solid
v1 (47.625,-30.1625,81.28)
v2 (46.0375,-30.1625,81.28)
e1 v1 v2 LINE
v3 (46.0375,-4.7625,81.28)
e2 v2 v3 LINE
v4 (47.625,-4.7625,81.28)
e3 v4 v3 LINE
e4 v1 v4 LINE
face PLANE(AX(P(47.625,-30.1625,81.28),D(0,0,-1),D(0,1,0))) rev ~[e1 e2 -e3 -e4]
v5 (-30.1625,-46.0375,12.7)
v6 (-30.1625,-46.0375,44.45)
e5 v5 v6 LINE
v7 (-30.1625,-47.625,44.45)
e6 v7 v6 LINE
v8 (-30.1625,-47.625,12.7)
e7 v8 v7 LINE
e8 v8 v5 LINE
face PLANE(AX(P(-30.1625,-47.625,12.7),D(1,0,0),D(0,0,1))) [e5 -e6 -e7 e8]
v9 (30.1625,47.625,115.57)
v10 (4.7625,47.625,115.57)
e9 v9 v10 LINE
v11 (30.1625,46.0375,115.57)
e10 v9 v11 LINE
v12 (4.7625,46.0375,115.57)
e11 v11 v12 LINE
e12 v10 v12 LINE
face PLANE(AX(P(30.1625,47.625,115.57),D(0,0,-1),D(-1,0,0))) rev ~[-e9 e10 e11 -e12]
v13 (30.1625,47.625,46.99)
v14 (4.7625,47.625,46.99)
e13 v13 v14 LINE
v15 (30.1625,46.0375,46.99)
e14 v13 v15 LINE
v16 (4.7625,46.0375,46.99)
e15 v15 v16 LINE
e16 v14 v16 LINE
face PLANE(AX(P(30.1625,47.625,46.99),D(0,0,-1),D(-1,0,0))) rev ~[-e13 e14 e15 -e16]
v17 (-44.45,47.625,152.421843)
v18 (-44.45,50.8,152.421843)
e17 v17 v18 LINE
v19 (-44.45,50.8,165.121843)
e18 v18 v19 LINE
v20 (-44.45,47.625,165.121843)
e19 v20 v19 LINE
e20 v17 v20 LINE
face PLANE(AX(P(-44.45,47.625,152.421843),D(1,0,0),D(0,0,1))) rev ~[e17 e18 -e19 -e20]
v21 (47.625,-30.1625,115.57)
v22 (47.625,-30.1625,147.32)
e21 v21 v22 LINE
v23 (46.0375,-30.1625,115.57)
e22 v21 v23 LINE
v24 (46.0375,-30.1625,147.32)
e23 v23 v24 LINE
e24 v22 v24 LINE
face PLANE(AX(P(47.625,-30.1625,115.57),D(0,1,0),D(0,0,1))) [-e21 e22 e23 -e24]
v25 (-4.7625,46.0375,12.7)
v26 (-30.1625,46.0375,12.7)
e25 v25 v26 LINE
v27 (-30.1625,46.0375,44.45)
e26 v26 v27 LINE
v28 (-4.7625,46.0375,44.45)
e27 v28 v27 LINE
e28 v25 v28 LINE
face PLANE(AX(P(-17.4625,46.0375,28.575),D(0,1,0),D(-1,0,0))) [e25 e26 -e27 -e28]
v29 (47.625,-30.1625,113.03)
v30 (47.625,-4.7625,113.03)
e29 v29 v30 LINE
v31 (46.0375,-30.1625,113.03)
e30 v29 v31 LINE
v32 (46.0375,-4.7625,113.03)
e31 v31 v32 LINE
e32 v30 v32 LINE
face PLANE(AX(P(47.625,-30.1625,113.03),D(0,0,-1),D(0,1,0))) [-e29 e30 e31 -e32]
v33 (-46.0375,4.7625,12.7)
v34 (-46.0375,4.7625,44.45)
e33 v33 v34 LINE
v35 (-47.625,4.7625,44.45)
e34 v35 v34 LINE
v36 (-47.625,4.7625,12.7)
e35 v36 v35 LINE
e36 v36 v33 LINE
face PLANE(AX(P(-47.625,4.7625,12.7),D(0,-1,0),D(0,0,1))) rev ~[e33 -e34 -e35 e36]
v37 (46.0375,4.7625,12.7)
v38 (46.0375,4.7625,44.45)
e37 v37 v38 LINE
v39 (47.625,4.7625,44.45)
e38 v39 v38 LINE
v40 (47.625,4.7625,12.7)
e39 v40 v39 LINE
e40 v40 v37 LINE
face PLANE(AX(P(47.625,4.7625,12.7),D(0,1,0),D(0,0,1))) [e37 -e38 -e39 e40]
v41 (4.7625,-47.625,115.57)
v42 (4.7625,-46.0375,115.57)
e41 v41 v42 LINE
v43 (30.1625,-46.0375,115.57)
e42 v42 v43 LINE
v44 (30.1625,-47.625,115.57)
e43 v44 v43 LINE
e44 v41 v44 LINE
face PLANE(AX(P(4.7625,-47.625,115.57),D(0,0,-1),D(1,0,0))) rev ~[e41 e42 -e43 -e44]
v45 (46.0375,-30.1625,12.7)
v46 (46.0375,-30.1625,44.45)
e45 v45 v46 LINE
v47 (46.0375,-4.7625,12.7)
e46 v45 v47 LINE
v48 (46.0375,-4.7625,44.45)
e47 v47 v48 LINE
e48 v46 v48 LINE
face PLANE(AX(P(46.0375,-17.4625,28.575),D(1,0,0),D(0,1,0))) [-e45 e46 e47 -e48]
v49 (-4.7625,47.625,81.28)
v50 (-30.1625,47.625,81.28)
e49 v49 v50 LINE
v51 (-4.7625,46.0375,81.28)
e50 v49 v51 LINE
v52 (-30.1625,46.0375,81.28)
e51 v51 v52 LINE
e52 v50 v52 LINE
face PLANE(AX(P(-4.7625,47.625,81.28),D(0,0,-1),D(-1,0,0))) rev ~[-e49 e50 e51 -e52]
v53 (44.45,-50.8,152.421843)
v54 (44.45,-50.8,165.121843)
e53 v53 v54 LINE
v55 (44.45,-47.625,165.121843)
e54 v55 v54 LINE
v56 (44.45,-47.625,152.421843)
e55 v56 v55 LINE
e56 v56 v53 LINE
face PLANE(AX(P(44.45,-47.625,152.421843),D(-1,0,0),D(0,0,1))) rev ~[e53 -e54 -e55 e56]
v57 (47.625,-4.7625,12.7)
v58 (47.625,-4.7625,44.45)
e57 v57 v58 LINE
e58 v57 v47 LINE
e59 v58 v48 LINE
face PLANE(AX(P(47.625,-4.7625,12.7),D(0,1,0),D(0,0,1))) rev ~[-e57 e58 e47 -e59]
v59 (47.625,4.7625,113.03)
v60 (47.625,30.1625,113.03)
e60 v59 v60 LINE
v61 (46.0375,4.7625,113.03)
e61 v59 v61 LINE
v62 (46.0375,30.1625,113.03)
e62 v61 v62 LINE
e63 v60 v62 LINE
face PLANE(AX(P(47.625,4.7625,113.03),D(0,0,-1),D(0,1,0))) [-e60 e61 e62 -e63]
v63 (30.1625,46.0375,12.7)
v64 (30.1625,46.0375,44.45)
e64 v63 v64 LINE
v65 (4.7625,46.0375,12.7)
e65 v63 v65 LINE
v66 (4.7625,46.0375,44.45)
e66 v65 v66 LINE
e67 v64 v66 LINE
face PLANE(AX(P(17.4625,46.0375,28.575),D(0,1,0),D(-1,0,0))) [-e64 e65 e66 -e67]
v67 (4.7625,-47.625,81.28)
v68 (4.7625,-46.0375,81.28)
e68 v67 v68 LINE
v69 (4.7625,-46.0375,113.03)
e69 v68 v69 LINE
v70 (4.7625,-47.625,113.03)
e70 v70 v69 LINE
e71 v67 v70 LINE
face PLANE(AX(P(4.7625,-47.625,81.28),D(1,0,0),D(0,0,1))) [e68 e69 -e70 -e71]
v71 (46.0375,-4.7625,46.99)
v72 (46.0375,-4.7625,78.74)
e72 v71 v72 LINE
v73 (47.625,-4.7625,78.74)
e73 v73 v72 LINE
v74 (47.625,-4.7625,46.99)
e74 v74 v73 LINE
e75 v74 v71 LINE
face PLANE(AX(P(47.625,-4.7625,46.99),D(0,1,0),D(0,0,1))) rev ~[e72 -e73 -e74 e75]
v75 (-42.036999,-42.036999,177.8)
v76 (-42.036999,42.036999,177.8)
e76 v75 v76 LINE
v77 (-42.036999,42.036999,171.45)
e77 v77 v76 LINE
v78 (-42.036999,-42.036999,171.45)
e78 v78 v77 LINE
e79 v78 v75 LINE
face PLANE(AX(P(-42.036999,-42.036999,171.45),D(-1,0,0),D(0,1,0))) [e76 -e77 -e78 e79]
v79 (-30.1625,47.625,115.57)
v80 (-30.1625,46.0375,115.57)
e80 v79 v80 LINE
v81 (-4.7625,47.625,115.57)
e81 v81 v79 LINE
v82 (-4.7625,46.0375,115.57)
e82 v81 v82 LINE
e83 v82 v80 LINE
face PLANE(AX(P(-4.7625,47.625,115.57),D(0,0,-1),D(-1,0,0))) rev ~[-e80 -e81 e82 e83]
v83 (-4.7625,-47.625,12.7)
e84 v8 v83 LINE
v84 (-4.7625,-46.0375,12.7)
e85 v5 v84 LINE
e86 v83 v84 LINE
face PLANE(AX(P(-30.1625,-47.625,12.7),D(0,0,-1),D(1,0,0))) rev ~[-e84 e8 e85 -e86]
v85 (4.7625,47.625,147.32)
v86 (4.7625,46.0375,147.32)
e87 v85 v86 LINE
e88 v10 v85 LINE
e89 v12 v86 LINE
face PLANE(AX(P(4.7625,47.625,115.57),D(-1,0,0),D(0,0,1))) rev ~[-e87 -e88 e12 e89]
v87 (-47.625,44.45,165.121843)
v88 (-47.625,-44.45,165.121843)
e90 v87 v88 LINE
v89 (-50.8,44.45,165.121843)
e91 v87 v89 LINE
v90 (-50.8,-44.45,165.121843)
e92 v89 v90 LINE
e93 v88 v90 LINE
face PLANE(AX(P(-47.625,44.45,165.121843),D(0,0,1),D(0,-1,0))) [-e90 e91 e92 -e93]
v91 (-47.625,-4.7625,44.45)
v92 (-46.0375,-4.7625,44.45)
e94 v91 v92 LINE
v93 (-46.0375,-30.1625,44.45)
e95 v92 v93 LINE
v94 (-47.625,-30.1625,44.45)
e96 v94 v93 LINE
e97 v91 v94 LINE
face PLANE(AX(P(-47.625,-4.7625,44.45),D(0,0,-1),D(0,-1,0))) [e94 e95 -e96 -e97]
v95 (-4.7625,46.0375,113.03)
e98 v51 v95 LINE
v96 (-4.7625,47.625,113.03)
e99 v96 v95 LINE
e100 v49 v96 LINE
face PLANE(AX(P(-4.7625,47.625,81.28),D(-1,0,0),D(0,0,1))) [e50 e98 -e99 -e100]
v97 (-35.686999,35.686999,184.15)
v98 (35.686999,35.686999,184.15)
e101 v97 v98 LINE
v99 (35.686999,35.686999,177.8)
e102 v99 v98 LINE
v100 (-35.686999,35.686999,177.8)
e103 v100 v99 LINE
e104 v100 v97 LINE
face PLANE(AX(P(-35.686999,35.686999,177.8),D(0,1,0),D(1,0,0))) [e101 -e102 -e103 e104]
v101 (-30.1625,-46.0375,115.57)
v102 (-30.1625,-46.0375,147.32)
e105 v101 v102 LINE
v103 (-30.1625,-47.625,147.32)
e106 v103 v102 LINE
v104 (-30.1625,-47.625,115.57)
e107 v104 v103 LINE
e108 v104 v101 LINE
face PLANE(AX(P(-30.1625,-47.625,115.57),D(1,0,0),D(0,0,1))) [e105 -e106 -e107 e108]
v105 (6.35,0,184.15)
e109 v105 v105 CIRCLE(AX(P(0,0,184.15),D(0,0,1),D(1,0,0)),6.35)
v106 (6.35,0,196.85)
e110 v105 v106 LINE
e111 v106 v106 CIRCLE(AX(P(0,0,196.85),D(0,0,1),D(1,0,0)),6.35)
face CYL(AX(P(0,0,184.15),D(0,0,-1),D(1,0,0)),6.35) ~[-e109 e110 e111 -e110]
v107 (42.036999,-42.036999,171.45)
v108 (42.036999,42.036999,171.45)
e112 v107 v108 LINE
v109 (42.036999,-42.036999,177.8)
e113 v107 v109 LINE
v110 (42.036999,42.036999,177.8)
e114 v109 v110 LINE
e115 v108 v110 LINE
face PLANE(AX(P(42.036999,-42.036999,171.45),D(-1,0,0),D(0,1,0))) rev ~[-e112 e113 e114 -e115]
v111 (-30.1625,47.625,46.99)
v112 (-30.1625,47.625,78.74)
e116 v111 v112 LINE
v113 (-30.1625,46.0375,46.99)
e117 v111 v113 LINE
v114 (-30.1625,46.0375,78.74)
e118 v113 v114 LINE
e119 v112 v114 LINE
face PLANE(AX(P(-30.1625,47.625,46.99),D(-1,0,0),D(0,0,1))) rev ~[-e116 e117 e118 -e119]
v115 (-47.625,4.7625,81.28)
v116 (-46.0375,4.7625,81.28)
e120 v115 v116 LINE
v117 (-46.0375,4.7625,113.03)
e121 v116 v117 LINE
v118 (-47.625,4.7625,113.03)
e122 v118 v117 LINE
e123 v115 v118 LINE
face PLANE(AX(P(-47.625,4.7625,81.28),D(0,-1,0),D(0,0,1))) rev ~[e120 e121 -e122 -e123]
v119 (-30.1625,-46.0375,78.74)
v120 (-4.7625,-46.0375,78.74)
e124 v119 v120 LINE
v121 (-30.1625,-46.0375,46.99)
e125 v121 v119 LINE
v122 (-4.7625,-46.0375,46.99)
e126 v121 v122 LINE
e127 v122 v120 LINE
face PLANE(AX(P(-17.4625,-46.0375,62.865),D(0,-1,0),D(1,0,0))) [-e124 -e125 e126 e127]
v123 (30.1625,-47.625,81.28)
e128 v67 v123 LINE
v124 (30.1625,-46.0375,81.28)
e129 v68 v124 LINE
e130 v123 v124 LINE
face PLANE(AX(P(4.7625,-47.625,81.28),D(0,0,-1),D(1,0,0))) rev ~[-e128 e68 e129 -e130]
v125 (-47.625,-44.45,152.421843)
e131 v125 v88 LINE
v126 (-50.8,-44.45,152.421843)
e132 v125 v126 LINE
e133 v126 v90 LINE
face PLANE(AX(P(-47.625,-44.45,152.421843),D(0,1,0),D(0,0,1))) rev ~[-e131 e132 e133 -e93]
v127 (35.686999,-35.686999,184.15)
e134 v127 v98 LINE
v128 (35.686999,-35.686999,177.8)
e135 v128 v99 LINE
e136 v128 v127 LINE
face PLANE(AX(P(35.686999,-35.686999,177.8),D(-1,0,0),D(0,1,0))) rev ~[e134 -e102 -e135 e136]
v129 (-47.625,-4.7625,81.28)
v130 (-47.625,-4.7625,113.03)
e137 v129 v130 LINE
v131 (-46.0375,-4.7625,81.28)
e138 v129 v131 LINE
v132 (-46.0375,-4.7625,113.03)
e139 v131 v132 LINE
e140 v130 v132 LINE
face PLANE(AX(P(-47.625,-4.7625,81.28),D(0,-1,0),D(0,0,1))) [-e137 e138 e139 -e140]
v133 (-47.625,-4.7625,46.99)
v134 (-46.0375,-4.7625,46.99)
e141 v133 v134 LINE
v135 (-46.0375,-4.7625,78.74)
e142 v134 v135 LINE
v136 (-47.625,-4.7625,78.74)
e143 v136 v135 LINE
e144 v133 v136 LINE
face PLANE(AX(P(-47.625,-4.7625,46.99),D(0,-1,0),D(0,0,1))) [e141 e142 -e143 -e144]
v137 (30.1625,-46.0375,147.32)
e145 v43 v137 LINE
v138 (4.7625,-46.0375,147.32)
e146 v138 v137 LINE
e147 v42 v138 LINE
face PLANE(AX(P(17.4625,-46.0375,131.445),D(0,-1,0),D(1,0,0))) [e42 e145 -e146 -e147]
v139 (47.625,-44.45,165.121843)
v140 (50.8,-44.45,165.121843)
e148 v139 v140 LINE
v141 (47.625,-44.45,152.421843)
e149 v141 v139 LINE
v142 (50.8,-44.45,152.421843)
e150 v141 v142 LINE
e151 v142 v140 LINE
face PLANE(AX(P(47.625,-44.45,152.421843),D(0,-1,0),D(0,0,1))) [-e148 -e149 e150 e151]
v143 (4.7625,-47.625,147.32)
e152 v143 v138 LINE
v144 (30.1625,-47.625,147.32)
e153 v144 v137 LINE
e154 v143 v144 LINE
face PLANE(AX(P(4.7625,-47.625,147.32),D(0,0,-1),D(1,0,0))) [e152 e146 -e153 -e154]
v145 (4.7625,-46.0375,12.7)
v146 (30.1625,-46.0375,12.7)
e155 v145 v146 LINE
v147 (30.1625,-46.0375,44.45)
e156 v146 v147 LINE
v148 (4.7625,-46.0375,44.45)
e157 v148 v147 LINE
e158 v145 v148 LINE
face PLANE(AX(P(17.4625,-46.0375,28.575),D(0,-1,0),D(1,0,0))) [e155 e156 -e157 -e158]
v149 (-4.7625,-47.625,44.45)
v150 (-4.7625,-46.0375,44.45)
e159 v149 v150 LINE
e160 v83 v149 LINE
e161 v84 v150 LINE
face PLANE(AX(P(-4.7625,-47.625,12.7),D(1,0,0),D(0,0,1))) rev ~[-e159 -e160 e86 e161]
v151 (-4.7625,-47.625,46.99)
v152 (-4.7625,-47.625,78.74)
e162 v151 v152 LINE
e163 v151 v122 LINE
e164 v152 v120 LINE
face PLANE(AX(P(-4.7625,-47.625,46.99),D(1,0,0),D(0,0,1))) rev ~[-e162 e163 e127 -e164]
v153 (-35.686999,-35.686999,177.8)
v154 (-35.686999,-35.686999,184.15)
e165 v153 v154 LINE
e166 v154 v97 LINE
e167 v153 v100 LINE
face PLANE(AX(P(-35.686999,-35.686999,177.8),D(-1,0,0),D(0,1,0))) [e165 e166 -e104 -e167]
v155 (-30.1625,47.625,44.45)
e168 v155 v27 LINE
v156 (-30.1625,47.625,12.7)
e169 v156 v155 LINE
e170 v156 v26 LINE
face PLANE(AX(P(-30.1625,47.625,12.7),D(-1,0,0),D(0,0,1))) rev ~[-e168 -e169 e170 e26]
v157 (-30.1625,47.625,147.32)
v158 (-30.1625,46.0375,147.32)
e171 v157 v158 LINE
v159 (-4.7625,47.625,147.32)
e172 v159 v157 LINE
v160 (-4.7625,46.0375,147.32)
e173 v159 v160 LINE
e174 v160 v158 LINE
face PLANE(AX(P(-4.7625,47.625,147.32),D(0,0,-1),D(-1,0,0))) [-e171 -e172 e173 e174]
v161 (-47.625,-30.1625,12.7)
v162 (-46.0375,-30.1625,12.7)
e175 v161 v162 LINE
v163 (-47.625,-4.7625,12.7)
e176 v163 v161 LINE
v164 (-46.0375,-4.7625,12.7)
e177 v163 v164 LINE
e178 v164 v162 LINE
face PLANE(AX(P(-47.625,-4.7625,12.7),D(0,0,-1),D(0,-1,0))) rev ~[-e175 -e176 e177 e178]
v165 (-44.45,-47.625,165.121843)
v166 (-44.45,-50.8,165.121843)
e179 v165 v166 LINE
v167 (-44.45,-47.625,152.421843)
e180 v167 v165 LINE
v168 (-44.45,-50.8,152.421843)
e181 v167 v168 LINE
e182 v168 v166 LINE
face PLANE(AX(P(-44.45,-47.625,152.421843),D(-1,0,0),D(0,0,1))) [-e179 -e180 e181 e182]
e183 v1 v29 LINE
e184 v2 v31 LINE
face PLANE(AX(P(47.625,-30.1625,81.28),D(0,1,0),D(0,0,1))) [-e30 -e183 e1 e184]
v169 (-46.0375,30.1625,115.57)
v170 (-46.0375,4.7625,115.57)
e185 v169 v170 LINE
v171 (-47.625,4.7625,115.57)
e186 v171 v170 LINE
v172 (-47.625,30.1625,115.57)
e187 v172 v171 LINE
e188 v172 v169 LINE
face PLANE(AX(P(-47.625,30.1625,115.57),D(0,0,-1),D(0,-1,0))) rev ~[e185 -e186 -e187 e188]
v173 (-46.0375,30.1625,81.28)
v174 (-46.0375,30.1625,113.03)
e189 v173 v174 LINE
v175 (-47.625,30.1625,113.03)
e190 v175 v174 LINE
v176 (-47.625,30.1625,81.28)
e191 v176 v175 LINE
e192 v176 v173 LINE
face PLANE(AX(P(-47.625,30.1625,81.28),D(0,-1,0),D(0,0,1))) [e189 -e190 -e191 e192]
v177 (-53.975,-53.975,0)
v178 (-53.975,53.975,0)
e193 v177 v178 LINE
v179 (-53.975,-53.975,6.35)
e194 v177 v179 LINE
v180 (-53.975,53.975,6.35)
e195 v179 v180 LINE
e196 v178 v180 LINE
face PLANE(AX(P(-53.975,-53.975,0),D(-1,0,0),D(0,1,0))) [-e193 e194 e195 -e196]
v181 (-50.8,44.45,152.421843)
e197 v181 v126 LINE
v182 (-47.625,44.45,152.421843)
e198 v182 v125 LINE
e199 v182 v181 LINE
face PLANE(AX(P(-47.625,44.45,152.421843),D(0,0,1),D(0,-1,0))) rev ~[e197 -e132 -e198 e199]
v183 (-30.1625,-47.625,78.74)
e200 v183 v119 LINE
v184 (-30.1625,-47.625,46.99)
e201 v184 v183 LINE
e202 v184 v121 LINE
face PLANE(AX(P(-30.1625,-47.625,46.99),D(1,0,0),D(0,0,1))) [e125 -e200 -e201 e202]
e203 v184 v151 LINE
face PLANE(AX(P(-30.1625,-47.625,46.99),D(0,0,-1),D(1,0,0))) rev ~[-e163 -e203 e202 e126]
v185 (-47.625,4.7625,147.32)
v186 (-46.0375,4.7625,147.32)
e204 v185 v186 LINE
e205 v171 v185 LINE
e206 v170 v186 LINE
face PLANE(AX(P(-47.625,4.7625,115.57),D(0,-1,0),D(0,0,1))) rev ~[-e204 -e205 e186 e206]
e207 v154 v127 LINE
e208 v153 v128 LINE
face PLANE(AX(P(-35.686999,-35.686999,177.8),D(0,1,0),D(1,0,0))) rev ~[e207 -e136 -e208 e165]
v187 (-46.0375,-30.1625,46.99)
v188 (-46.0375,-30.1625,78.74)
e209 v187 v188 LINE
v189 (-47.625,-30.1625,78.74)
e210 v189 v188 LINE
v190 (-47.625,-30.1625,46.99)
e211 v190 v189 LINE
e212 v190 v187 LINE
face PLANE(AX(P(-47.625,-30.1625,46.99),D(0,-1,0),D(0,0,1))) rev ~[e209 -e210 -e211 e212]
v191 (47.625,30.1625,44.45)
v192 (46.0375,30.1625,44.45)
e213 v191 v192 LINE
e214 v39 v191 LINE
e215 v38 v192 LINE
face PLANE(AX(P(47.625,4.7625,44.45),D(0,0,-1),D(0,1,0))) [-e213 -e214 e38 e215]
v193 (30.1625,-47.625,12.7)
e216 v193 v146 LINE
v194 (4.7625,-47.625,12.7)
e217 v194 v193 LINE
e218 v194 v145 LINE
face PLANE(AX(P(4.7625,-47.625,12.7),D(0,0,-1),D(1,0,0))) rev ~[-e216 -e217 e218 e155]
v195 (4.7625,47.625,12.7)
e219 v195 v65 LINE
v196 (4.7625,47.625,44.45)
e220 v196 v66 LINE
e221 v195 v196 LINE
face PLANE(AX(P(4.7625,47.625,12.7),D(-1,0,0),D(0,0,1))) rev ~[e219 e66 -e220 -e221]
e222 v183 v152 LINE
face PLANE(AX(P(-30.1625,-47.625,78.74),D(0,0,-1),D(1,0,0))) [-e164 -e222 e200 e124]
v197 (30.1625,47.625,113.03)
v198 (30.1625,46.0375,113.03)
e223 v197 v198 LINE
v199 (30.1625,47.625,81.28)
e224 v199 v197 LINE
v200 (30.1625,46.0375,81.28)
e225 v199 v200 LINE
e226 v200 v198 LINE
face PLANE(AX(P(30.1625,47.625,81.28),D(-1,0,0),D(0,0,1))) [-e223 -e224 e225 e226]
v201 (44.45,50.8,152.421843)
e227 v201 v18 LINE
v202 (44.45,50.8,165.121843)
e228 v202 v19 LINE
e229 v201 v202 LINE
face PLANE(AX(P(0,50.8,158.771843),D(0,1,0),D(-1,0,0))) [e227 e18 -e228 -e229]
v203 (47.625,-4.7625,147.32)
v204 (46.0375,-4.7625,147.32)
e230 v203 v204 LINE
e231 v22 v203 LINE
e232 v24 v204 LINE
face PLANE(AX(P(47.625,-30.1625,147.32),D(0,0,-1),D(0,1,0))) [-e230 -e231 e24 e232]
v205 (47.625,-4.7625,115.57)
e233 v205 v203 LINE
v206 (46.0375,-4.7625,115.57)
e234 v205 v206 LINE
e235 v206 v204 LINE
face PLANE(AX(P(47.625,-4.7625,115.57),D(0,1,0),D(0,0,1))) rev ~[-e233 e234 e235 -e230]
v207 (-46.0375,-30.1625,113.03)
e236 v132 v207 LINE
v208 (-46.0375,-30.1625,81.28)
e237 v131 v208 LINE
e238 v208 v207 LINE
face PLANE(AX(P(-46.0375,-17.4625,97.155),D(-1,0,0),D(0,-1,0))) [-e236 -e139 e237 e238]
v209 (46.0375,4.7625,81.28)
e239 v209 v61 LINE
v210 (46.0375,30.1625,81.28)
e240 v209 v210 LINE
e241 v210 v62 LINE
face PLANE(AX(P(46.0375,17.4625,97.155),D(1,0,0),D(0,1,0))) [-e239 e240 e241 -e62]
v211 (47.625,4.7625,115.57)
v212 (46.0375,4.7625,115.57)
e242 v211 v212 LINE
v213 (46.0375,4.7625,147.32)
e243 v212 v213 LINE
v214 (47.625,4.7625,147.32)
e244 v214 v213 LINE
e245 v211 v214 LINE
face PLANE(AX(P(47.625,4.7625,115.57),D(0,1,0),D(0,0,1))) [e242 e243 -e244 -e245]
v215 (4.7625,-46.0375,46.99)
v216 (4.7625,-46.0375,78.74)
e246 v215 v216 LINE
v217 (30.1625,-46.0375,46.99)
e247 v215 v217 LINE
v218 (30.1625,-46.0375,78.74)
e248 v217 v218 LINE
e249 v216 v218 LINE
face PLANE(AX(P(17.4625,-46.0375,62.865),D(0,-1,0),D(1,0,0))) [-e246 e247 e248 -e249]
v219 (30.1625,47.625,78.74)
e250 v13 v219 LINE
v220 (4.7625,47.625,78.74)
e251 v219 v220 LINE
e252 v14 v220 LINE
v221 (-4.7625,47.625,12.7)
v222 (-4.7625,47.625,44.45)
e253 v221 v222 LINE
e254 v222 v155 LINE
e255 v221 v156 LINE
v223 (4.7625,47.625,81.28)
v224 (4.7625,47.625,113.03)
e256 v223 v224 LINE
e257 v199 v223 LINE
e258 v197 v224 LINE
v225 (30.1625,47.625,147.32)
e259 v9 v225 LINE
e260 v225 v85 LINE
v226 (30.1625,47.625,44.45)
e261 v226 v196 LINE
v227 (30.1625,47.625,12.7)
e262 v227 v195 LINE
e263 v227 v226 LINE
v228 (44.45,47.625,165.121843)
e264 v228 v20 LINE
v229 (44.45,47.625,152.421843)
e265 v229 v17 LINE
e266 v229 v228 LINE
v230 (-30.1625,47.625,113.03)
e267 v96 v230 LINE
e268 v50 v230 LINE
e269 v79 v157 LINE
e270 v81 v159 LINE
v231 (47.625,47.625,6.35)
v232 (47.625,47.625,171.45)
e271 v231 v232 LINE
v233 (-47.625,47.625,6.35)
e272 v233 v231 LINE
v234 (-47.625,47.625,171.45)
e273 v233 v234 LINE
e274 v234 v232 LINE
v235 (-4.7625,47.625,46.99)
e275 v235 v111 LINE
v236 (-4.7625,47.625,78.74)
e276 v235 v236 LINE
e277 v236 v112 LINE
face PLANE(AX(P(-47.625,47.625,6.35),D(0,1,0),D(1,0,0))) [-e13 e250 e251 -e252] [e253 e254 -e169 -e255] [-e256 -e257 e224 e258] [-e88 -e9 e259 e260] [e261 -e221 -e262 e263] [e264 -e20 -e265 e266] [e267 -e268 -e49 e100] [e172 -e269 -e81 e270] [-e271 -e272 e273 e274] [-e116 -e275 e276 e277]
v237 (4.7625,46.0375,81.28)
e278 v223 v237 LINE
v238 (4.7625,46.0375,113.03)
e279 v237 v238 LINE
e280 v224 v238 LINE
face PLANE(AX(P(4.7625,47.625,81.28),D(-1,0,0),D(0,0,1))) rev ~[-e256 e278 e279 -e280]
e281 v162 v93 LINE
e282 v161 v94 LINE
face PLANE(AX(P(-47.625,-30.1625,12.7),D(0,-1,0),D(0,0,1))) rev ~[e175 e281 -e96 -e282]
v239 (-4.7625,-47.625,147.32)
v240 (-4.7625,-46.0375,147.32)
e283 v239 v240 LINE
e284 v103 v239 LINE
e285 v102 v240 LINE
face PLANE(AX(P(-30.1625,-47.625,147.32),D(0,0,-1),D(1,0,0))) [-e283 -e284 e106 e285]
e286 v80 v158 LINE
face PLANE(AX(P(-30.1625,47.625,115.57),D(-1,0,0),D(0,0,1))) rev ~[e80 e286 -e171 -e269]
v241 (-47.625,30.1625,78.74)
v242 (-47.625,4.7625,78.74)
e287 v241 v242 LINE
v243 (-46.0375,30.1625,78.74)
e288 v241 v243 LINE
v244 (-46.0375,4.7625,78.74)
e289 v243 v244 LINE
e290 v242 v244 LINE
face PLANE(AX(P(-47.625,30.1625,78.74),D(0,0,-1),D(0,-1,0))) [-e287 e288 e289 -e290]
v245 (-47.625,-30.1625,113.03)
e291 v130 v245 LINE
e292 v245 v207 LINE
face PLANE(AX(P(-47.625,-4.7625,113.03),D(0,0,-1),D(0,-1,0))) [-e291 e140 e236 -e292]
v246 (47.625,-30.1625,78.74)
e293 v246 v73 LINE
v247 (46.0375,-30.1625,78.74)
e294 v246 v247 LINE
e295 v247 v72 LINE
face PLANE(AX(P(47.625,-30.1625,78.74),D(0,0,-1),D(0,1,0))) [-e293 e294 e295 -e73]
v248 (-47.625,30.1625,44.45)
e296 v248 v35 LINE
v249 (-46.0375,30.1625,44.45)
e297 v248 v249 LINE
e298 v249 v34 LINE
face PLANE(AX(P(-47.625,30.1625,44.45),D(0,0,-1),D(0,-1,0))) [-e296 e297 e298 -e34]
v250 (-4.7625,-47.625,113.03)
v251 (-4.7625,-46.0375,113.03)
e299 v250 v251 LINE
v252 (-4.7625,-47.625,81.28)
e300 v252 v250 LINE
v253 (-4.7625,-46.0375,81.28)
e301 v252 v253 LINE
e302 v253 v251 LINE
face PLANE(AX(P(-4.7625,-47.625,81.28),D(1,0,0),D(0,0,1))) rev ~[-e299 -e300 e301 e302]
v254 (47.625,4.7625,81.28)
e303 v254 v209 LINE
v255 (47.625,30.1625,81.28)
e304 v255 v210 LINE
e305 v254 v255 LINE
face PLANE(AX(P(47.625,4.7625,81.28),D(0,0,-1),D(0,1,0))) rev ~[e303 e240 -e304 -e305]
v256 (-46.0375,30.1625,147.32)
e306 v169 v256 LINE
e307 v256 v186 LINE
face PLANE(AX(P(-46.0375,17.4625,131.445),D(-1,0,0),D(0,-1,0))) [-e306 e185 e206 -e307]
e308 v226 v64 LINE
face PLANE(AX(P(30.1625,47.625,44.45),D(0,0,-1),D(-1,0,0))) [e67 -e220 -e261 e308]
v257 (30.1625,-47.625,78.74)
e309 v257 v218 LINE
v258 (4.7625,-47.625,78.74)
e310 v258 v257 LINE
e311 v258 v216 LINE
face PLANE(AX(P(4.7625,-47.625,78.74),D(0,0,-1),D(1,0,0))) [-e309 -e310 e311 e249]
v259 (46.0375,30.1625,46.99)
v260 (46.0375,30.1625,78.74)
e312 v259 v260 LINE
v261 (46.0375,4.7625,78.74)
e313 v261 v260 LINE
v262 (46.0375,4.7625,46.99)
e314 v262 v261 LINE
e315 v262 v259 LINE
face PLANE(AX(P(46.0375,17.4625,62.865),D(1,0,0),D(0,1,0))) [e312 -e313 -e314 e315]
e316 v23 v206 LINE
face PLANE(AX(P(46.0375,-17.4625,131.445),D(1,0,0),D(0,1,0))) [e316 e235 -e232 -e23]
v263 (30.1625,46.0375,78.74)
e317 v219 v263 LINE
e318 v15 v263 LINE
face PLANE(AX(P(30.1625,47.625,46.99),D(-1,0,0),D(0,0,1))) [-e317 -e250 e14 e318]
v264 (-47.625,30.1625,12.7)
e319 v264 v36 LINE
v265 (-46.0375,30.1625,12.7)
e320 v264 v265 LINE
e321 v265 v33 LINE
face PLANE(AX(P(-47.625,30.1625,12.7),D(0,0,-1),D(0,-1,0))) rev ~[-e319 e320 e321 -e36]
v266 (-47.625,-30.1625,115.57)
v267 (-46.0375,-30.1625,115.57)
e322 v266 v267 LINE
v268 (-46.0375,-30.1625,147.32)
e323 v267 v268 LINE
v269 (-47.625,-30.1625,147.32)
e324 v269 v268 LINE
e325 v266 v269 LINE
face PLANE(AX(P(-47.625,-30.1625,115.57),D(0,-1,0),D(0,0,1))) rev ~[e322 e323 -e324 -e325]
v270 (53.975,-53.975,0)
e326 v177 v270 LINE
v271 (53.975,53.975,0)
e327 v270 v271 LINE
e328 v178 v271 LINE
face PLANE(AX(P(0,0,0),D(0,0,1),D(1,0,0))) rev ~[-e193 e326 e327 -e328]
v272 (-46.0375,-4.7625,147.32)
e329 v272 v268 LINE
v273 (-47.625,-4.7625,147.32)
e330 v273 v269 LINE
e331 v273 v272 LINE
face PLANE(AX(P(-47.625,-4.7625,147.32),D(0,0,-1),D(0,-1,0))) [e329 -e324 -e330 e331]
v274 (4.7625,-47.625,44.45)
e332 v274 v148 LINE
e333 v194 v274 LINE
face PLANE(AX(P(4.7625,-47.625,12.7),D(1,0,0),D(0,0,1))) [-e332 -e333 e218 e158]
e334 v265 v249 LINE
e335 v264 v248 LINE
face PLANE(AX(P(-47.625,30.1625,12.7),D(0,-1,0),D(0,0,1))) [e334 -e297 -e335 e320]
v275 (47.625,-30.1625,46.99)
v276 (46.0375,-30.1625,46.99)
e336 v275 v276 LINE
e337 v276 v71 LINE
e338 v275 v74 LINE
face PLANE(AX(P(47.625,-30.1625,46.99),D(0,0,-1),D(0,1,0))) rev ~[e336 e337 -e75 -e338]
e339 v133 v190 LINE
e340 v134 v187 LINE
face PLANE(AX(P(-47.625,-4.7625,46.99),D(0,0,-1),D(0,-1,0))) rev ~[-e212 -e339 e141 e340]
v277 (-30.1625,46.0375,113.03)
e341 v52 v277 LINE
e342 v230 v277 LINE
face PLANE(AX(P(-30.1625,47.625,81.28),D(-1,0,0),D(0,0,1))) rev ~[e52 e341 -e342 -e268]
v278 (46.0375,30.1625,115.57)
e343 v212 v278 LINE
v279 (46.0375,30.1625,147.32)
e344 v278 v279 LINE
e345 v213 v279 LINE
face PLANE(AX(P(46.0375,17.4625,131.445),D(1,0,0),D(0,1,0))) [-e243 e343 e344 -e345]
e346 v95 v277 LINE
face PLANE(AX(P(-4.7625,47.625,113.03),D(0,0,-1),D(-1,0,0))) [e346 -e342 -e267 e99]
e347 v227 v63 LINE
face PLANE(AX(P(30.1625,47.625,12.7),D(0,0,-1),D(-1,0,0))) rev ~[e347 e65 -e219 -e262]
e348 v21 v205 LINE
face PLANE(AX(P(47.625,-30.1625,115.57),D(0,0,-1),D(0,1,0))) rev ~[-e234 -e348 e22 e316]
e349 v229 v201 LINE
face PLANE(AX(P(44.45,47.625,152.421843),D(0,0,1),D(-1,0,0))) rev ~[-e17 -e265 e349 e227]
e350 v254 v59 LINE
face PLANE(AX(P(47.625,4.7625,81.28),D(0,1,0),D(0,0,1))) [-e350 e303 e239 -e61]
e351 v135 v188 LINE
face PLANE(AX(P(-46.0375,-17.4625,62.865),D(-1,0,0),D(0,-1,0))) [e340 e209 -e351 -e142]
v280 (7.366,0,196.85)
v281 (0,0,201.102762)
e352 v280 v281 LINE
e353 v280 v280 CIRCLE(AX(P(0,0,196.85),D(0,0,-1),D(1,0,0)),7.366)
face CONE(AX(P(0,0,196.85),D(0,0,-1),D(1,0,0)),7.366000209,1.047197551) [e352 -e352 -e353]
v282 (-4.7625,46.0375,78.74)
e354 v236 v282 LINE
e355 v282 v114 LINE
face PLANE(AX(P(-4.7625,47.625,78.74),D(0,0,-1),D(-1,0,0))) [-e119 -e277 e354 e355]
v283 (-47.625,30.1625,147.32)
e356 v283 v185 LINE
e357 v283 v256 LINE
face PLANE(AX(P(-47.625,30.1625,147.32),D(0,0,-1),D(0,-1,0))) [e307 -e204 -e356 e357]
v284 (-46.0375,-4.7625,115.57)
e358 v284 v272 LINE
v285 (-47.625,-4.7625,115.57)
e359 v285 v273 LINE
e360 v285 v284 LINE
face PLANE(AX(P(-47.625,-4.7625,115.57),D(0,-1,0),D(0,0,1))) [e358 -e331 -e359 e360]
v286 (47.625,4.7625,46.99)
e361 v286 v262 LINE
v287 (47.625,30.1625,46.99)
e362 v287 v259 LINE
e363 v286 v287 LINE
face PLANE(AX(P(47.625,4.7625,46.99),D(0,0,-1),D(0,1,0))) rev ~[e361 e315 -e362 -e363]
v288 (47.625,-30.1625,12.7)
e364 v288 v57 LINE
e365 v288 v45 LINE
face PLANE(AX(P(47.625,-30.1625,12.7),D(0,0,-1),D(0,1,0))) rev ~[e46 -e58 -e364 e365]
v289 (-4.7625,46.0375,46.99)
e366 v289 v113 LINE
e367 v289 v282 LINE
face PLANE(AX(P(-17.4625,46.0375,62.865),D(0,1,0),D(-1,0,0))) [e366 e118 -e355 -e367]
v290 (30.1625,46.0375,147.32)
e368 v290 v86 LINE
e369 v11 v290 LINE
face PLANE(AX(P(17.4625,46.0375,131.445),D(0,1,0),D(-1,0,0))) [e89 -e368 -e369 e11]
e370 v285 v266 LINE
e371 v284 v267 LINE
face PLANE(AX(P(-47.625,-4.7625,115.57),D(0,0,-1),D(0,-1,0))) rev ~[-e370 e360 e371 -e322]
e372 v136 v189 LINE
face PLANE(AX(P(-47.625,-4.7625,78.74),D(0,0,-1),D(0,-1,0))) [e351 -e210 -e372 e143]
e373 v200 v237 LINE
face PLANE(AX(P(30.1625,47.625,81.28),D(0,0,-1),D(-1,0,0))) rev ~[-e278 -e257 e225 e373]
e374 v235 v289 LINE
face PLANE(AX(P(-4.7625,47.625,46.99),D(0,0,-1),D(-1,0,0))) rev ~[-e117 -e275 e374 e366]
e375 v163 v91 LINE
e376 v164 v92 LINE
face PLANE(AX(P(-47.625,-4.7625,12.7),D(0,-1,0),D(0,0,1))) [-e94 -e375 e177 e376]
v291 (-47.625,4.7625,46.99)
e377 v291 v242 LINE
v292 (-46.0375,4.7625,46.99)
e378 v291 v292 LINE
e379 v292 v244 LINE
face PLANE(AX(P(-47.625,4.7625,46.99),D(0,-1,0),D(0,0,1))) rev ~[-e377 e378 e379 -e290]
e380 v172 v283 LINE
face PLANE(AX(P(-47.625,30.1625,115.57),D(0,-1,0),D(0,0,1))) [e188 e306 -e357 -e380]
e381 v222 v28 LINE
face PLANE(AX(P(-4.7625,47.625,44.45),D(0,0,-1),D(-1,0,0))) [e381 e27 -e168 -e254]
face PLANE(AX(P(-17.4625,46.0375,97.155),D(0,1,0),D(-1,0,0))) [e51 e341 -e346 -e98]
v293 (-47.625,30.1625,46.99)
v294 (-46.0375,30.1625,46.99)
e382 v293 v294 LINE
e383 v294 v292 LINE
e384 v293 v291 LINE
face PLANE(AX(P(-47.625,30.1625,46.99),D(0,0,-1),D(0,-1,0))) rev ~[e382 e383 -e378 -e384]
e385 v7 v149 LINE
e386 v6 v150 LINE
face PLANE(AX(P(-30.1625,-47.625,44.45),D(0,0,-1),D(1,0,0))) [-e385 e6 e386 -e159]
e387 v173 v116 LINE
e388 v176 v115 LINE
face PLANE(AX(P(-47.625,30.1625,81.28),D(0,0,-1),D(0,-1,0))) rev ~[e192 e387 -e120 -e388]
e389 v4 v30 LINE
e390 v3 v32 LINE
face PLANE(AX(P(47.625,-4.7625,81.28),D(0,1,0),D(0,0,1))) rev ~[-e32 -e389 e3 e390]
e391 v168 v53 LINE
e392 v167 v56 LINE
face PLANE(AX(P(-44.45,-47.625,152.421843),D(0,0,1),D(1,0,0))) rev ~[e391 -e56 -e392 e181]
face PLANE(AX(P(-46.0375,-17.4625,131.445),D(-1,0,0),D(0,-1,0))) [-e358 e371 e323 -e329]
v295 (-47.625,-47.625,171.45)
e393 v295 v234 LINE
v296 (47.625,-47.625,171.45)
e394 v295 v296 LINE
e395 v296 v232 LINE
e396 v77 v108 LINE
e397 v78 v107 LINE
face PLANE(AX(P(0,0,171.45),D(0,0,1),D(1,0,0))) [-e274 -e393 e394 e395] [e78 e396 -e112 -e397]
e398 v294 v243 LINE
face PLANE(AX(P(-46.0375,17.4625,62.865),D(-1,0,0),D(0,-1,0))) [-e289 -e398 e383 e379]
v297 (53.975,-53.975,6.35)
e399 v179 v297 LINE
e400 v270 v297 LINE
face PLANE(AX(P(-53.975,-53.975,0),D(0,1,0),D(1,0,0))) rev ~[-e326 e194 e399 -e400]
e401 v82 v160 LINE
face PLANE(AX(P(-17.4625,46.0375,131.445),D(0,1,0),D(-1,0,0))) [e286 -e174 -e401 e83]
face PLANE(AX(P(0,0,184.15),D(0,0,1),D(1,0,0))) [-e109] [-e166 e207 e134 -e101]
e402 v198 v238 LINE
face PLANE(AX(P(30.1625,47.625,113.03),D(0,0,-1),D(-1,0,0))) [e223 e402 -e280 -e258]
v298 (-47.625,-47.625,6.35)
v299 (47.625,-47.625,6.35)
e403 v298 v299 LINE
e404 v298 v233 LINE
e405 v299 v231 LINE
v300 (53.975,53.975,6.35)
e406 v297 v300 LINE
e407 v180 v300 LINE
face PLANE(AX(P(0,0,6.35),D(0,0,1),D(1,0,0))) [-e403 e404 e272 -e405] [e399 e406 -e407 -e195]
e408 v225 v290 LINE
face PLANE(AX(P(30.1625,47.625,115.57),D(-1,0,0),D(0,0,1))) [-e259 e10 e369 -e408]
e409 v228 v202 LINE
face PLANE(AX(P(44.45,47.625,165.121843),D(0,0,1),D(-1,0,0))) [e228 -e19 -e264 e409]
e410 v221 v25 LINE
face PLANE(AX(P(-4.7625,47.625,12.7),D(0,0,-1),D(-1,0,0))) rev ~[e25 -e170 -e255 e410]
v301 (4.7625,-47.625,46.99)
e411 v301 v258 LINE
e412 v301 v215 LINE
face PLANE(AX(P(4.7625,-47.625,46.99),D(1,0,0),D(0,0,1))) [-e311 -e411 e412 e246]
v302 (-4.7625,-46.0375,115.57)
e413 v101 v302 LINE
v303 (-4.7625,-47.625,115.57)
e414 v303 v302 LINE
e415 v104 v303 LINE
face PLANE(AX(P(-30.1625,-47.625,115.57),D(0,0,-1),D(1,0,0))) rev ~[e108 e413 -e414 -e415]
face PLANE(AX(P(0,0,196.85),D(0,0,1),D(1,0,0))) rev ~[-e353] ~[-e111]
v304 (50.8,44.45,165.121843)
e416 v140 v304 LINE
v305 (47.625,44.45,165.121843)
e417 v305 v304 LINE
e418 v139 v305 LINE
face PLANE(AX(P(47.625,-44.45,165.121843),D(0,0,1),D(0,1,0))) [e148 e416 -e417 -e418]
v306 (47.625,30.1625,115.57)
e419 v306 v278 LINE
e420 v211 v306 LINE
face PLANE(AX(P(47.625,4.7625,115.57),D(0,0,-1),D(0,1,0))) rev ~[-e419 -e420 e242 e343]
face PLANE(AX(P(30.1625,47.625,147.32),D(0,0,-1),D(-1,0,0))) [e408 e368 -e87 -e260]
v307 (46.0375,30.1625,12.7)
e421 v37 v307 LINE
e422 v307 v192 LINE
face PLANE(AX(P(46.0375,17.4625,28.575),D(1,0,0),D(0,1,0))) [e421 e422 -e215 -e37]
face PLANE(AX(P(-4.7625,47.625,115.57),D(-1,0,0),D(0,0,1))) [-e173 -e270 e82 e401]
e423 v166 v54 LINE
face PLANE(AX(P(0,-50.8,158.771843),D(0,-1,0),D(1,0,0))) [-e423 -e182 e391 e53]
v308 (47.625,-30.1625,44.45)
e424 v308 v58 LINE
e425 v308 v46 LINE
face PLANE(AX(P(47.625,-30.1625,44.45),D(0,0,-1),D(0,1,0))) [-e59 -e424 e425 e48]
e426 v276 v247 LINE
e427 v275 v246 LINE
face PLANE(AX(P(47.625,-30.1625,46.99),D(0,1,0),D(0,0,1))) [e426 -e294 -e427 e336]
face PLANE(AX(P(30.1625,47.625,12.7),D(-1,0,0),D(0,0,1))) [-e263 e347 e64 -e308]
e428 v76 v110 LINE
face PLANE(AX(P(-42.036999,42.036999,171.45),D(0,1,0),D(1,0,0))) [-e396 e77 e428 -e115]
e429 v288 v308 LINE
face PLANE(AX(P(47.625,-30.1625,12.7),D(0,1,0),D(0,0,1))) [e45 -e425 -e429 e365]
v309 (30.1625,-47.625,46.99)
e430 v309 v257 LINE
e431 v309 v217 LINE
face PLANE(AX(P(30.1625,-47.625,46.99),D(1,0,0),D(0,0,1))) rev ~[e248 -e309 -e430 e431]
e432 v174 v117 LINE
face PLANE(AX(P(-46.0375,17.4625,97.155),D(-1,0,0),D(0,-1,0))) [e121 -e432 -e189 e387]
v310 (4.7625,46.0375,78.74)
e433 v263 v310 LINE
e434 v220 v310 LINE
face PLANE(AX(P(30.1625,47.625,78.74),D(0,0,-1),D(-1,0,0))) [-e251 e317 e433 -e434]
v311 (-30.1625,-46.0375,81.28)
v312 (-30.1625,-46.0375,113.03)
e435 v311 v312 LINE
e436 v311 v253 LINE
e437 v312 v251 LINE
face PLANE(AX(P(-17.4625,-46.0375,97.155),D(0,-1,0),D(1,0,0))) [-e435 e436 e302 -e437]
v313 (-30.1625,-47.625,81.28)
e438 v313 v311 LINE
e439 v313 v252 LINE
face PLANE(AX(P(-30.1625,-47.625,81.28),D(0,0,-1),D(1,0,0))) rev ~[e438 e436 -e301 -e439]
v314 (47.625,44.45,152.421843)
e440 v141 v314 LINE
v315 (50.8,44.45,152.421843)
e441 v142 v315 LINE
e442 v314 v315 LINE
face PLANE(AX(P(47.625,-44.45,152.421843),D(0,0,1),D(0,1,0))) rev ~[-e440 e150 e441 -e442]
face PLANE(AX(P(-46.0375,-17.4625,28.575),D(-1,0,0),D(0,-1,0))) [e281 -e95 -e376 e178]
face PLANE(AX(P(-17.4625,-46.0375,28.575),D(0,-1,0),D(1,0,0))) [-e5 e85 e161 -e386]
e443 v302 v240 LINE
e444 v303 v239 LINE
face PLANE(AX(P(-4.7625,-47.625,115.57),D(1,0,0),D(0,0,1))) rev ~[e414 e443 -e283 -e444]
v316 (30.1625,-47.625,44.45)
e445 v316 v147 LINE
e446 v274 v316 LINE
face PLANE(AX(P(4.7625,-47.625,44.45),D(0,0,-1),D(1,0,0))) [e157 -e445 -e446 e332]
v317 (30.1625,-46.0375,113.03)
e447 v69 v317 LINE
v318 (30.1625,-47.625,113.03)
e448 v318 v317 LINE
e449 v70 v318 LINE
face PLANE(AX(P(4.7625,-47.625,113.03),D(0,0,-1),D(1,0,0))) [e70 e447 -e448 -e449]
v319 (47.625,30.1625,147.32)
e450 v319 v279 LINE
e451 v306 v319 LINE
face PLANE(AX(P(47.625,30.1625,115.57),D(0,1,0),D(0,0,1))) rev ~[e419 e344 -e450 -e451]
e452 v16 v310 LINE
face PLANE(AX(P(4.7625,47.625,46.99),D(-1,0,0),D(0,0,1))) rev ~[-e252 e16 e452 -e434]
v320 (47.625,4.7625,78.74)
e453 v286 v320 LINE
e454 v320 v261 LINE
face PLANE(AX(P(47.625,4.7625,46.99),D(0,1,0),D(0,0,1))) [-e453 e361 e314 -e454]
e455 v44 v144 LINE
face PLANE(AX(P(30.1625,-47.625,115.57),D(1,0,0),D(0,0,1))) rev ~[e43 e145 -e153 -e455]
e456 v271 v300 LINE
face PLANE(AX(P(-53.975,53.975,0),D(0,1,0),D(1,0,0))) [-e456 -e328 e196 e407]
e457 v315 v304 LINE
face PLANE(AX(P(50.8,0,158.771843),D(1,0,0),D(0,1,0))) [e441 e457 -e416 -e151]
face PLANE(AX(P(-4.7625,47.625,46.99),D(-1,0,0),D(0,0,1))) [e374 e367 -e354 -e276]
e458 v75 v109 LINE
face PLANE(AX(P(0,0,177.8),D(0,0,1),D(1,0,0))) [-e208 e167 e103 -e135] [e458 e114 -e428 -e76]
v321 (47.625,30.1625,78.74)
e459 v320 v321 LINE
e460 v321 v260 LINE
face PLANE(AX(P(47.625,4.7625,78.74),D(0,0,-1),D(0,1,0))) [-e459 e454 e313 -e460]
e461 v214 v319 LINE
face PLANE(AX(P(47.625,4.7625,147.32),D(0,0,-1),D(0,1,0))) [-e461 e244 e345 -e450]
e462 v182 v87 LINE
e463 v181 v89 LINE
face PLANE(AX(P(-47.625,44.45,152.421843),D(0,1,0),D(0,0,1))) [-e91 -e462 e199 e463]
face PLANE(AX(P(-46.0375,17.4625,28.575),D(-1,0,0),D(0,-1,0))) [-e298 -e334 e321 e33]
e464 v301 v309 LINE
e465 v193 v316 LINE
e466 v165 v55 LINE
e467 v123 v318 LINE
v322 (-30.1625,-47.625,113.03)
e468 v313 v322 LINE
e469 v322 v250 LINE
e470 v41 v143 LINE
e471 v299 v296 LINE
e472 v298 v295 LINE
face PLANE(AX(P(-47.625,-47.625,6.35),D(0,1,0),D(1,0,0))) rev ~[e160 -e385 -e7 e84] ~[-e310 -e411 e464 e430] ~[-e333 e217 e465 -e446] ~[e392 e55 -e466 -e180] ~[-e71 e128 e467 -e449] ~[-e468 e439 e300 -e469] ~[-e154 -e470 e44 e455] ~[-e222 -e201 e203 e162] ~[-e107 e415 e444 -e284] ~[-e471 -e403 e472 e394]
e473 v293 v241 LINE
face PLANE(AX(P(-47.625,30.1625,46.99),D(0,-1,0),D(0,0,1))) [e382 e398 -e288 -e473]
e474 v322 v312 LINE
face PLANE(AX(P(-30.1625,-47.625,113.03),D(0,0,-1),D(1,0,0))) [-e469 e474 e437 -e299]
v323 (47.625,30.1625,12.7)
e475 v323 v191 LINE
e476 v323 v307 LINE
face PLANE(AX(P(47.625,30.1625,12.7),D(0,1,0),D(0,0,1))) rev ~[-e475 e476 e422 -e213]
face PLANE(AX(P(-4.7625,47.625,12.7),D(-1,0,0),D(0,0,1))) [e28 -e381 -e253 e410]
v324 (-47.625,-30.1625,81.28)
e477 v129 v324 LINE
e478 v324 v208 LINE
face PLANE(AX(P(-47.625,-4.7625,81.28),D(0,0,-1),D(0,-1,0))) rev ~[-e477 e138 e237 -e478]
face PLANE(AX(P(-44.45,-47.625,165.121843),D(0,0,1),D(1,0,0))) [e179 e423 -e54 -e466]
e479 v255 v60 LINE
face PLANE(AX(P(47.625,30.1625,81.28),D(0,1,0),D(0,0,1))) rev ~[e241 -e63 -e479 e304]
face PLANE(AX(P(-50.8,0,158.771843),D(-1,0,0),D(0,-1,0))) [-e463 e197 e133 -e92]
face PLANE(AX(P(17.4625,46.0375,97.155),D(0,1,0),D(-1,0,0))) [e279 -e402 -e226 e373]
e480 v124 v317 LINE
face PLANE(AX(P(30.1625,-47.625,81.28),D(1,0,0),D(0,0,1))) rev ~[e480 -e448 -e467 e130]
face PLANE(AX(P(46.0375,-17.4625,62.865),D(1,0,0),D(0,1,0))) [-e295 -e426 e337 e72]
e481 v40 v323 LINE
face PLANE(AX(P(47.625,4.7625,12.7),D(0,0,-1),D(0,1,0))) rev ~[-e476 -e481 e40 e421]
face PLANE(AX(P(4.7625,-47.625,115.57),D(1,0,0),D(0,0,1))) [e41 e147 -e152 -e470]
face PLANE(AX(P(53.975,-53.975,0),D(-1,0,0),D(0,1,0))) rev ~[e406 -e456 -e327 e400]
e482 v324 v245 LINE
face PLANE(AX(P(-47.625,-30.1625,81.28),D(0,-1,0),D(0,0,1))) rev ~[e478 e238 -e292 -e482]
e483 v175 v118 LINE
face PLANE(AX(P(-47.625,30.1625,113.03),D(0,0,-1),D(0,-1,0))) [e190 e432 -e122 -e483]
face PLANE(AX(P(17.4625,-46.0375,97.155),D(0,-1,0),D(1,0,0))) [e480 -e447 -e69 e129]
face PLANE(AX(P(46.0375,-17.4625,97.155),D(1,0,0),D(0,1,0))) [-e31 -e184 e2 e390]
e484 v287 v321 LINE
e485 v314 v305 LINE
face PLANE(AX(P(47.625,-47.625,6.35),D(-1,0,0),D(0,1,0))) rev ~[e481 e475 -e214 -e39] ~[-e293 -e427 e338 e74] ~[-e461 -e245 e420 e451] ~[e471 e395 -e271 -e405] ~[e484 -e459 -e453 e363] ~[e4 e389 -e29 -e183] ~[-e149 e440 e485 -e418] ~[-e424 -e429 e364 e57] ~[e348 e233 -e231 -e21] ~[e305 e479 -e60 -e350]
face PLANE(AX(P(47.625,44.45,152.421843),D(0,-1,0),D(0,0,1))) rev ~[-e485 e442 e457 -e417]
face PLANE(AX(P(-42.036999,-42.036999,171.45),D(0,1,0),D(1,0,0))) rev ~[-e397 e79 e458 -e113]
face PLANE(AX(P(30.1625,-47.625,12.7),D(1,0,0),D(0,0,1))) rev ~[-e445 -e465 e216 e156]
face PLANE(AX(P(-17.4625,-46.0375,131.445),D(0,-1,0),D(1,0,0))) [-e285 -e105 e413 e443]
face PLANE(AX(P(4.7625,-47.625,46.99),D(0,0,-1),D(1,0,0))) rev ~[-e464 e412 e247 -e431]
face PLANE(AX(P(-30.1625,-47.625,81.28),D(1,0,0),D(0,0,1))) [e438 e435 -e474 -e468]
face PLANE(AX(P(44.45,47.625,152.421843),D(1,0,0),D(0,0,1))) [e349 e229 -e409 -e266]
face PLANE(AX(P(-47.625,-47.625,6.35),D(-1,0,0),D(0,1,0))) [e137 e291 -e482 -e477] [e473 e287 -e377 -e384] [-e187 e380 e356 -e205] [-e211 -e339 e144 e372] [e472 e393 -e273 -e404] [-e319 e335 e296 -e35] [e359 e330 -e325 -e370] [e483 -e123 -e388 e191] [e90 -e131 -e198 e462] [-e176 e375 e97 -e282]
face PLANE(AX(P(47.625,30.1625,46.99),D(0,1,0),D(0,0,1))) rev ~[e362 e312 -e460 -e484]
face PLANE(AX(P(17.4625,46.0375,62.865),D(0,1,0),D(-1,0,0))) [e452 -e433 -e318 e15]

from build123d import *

# Parameters (mm, degrees)
F0_W             = 107.95
F0_H             = 107.95
F1_DEPTH         = 6.35
F2_W             = 95.25
F2_H             = 95.25
F3_DEPTH         = 165.1
F4_W             = 84.073998034
F4_H             = 84.073998034
F5_DEPTH         = 6.35
F6_W             = 71.373998034
F6_H             = 71.373998034
F7_DEPTH         = 6.35
F8_W             = 88.9
F8_H             = 12.7
F9_DEPTH         = 3.175
F9_COPIES_COUNT  = 4
F11_R            = 6.35
F12_DEPTH        = 12.7
F13_R            = 7.366000209
F14_DEPTH        = 25.4
F14_TAPER        = 60
F15_W            = 25.4
F15_H            = 31.75
F16_DEPTH        = 1.5875
F16_COPIES_COUNT = 4


# Not quite as in the source:
# - a pattern or mirror of a feature is missing from the dataset's text; its kind, count and spacing are read off the source's solid


with BuildPart() as f1:
    # F0 (on Top) → F1 (new body)
    with BuildSketch(Plane.XY):
        Rectangle(F0_W, F0_H)
    extrude(amount=F1_DEPTH)

    # F2 (on face) → F3 (join)
    with BuildSketch(Plane.XY.offset(6.35)):
        Rectangle(F2_W, F2_H)
    extrude(amount=F3_DEPTH)

    # F4 (on face) → F5 (join)
    with BuildSketch(Plane.XY.offset(171.45)):
        Rectangle(F4_W, F4_H)
    extrude(amount=F5_DEPTH)

    # F6 (on face) → F7 (join)
    with BuildSketch(Plane.XY.offset(177.8)):
        Rectangle(F6_W, F6_H)
    extrude(amount=F7_DEPTH)

    # F8 (on face) → F9 (join)
    with BuildSketch(Plane(origin=(-47.625, 0, 0), x_dir=(0, -1, 0), z_dir=(-1, 0, 0))):
        with Locations((0, 158.7718427181)):
            Rectangle(F8_W, F8_H)
    f9 = extrude(amount=F9_DEPTH)

    # F9_copies: F9 ×4 about axis
    f9_copies_axis = Axis((0, 0, 0), (0, 0, 1))
    for i in range(1, F9_COPIES_COUNT):
        add(f9.rotate(f9_copies_axis, i * 360 / F9_COPIES_COUNT))

    # F11 (on face) → F12 (join)
    with BuildSketch(Plane.XY.offset(184.15)):
        Circle(F11_R)
    extrude(amount=F12_DEPTH)

    # F13 (on face) → F14 (join)
    with BuildSketch(Plane.XY.offset(196.85)):
        Circle(F13_R)
    extrude(amount=F14_DEPTH, taper=F14_TAPER)

    # F15 (on face) → F16 (cut)
    with BuildSketch(Plane.XZ.offset(47.625)):
        with Locations((-17.4625, 28.575)):
            Rectangle(F15_W, F15_H)
        with Locations((-17.4625, 62.865)):
            Rectangle(F15_W, F15_H)
        with Locations((-17.4625, 97.155)):
            Rectangle(F15_W, F15_H)
        with Locations((-17.4625, 131.445)):
            Rectangle(F15_W, F15_H)
        with Locations((17.4625, 97.155)):
            Rectangle(F15_W, F15_H)
        with Locations((17.4625, 131.445)):
            Rectangle(F15_W, F15_H)
        with Locations((17.4625, 62.865)):
            Rectangle(F15_W, F15_H)
        with Locations((17.4625, 28.575)):
            Rectangle(F15_W, F15_H)
    f16 = extrude(amount=-F16_DEPTH, mode=Mode.SUBTRACT)

    # F16_copies: F16 ×4 about axis
    f16_copies_axis = Axis((0, 0, 0), (0, 0, 1))
    for i in range(1, F16_COPIES_COUNT):
        add(f16.rotate(f16_copies_axis, i * 360 / F16_COPIES_COUNT), mode=Mode.SUBTRACT)


solid = f1.part
